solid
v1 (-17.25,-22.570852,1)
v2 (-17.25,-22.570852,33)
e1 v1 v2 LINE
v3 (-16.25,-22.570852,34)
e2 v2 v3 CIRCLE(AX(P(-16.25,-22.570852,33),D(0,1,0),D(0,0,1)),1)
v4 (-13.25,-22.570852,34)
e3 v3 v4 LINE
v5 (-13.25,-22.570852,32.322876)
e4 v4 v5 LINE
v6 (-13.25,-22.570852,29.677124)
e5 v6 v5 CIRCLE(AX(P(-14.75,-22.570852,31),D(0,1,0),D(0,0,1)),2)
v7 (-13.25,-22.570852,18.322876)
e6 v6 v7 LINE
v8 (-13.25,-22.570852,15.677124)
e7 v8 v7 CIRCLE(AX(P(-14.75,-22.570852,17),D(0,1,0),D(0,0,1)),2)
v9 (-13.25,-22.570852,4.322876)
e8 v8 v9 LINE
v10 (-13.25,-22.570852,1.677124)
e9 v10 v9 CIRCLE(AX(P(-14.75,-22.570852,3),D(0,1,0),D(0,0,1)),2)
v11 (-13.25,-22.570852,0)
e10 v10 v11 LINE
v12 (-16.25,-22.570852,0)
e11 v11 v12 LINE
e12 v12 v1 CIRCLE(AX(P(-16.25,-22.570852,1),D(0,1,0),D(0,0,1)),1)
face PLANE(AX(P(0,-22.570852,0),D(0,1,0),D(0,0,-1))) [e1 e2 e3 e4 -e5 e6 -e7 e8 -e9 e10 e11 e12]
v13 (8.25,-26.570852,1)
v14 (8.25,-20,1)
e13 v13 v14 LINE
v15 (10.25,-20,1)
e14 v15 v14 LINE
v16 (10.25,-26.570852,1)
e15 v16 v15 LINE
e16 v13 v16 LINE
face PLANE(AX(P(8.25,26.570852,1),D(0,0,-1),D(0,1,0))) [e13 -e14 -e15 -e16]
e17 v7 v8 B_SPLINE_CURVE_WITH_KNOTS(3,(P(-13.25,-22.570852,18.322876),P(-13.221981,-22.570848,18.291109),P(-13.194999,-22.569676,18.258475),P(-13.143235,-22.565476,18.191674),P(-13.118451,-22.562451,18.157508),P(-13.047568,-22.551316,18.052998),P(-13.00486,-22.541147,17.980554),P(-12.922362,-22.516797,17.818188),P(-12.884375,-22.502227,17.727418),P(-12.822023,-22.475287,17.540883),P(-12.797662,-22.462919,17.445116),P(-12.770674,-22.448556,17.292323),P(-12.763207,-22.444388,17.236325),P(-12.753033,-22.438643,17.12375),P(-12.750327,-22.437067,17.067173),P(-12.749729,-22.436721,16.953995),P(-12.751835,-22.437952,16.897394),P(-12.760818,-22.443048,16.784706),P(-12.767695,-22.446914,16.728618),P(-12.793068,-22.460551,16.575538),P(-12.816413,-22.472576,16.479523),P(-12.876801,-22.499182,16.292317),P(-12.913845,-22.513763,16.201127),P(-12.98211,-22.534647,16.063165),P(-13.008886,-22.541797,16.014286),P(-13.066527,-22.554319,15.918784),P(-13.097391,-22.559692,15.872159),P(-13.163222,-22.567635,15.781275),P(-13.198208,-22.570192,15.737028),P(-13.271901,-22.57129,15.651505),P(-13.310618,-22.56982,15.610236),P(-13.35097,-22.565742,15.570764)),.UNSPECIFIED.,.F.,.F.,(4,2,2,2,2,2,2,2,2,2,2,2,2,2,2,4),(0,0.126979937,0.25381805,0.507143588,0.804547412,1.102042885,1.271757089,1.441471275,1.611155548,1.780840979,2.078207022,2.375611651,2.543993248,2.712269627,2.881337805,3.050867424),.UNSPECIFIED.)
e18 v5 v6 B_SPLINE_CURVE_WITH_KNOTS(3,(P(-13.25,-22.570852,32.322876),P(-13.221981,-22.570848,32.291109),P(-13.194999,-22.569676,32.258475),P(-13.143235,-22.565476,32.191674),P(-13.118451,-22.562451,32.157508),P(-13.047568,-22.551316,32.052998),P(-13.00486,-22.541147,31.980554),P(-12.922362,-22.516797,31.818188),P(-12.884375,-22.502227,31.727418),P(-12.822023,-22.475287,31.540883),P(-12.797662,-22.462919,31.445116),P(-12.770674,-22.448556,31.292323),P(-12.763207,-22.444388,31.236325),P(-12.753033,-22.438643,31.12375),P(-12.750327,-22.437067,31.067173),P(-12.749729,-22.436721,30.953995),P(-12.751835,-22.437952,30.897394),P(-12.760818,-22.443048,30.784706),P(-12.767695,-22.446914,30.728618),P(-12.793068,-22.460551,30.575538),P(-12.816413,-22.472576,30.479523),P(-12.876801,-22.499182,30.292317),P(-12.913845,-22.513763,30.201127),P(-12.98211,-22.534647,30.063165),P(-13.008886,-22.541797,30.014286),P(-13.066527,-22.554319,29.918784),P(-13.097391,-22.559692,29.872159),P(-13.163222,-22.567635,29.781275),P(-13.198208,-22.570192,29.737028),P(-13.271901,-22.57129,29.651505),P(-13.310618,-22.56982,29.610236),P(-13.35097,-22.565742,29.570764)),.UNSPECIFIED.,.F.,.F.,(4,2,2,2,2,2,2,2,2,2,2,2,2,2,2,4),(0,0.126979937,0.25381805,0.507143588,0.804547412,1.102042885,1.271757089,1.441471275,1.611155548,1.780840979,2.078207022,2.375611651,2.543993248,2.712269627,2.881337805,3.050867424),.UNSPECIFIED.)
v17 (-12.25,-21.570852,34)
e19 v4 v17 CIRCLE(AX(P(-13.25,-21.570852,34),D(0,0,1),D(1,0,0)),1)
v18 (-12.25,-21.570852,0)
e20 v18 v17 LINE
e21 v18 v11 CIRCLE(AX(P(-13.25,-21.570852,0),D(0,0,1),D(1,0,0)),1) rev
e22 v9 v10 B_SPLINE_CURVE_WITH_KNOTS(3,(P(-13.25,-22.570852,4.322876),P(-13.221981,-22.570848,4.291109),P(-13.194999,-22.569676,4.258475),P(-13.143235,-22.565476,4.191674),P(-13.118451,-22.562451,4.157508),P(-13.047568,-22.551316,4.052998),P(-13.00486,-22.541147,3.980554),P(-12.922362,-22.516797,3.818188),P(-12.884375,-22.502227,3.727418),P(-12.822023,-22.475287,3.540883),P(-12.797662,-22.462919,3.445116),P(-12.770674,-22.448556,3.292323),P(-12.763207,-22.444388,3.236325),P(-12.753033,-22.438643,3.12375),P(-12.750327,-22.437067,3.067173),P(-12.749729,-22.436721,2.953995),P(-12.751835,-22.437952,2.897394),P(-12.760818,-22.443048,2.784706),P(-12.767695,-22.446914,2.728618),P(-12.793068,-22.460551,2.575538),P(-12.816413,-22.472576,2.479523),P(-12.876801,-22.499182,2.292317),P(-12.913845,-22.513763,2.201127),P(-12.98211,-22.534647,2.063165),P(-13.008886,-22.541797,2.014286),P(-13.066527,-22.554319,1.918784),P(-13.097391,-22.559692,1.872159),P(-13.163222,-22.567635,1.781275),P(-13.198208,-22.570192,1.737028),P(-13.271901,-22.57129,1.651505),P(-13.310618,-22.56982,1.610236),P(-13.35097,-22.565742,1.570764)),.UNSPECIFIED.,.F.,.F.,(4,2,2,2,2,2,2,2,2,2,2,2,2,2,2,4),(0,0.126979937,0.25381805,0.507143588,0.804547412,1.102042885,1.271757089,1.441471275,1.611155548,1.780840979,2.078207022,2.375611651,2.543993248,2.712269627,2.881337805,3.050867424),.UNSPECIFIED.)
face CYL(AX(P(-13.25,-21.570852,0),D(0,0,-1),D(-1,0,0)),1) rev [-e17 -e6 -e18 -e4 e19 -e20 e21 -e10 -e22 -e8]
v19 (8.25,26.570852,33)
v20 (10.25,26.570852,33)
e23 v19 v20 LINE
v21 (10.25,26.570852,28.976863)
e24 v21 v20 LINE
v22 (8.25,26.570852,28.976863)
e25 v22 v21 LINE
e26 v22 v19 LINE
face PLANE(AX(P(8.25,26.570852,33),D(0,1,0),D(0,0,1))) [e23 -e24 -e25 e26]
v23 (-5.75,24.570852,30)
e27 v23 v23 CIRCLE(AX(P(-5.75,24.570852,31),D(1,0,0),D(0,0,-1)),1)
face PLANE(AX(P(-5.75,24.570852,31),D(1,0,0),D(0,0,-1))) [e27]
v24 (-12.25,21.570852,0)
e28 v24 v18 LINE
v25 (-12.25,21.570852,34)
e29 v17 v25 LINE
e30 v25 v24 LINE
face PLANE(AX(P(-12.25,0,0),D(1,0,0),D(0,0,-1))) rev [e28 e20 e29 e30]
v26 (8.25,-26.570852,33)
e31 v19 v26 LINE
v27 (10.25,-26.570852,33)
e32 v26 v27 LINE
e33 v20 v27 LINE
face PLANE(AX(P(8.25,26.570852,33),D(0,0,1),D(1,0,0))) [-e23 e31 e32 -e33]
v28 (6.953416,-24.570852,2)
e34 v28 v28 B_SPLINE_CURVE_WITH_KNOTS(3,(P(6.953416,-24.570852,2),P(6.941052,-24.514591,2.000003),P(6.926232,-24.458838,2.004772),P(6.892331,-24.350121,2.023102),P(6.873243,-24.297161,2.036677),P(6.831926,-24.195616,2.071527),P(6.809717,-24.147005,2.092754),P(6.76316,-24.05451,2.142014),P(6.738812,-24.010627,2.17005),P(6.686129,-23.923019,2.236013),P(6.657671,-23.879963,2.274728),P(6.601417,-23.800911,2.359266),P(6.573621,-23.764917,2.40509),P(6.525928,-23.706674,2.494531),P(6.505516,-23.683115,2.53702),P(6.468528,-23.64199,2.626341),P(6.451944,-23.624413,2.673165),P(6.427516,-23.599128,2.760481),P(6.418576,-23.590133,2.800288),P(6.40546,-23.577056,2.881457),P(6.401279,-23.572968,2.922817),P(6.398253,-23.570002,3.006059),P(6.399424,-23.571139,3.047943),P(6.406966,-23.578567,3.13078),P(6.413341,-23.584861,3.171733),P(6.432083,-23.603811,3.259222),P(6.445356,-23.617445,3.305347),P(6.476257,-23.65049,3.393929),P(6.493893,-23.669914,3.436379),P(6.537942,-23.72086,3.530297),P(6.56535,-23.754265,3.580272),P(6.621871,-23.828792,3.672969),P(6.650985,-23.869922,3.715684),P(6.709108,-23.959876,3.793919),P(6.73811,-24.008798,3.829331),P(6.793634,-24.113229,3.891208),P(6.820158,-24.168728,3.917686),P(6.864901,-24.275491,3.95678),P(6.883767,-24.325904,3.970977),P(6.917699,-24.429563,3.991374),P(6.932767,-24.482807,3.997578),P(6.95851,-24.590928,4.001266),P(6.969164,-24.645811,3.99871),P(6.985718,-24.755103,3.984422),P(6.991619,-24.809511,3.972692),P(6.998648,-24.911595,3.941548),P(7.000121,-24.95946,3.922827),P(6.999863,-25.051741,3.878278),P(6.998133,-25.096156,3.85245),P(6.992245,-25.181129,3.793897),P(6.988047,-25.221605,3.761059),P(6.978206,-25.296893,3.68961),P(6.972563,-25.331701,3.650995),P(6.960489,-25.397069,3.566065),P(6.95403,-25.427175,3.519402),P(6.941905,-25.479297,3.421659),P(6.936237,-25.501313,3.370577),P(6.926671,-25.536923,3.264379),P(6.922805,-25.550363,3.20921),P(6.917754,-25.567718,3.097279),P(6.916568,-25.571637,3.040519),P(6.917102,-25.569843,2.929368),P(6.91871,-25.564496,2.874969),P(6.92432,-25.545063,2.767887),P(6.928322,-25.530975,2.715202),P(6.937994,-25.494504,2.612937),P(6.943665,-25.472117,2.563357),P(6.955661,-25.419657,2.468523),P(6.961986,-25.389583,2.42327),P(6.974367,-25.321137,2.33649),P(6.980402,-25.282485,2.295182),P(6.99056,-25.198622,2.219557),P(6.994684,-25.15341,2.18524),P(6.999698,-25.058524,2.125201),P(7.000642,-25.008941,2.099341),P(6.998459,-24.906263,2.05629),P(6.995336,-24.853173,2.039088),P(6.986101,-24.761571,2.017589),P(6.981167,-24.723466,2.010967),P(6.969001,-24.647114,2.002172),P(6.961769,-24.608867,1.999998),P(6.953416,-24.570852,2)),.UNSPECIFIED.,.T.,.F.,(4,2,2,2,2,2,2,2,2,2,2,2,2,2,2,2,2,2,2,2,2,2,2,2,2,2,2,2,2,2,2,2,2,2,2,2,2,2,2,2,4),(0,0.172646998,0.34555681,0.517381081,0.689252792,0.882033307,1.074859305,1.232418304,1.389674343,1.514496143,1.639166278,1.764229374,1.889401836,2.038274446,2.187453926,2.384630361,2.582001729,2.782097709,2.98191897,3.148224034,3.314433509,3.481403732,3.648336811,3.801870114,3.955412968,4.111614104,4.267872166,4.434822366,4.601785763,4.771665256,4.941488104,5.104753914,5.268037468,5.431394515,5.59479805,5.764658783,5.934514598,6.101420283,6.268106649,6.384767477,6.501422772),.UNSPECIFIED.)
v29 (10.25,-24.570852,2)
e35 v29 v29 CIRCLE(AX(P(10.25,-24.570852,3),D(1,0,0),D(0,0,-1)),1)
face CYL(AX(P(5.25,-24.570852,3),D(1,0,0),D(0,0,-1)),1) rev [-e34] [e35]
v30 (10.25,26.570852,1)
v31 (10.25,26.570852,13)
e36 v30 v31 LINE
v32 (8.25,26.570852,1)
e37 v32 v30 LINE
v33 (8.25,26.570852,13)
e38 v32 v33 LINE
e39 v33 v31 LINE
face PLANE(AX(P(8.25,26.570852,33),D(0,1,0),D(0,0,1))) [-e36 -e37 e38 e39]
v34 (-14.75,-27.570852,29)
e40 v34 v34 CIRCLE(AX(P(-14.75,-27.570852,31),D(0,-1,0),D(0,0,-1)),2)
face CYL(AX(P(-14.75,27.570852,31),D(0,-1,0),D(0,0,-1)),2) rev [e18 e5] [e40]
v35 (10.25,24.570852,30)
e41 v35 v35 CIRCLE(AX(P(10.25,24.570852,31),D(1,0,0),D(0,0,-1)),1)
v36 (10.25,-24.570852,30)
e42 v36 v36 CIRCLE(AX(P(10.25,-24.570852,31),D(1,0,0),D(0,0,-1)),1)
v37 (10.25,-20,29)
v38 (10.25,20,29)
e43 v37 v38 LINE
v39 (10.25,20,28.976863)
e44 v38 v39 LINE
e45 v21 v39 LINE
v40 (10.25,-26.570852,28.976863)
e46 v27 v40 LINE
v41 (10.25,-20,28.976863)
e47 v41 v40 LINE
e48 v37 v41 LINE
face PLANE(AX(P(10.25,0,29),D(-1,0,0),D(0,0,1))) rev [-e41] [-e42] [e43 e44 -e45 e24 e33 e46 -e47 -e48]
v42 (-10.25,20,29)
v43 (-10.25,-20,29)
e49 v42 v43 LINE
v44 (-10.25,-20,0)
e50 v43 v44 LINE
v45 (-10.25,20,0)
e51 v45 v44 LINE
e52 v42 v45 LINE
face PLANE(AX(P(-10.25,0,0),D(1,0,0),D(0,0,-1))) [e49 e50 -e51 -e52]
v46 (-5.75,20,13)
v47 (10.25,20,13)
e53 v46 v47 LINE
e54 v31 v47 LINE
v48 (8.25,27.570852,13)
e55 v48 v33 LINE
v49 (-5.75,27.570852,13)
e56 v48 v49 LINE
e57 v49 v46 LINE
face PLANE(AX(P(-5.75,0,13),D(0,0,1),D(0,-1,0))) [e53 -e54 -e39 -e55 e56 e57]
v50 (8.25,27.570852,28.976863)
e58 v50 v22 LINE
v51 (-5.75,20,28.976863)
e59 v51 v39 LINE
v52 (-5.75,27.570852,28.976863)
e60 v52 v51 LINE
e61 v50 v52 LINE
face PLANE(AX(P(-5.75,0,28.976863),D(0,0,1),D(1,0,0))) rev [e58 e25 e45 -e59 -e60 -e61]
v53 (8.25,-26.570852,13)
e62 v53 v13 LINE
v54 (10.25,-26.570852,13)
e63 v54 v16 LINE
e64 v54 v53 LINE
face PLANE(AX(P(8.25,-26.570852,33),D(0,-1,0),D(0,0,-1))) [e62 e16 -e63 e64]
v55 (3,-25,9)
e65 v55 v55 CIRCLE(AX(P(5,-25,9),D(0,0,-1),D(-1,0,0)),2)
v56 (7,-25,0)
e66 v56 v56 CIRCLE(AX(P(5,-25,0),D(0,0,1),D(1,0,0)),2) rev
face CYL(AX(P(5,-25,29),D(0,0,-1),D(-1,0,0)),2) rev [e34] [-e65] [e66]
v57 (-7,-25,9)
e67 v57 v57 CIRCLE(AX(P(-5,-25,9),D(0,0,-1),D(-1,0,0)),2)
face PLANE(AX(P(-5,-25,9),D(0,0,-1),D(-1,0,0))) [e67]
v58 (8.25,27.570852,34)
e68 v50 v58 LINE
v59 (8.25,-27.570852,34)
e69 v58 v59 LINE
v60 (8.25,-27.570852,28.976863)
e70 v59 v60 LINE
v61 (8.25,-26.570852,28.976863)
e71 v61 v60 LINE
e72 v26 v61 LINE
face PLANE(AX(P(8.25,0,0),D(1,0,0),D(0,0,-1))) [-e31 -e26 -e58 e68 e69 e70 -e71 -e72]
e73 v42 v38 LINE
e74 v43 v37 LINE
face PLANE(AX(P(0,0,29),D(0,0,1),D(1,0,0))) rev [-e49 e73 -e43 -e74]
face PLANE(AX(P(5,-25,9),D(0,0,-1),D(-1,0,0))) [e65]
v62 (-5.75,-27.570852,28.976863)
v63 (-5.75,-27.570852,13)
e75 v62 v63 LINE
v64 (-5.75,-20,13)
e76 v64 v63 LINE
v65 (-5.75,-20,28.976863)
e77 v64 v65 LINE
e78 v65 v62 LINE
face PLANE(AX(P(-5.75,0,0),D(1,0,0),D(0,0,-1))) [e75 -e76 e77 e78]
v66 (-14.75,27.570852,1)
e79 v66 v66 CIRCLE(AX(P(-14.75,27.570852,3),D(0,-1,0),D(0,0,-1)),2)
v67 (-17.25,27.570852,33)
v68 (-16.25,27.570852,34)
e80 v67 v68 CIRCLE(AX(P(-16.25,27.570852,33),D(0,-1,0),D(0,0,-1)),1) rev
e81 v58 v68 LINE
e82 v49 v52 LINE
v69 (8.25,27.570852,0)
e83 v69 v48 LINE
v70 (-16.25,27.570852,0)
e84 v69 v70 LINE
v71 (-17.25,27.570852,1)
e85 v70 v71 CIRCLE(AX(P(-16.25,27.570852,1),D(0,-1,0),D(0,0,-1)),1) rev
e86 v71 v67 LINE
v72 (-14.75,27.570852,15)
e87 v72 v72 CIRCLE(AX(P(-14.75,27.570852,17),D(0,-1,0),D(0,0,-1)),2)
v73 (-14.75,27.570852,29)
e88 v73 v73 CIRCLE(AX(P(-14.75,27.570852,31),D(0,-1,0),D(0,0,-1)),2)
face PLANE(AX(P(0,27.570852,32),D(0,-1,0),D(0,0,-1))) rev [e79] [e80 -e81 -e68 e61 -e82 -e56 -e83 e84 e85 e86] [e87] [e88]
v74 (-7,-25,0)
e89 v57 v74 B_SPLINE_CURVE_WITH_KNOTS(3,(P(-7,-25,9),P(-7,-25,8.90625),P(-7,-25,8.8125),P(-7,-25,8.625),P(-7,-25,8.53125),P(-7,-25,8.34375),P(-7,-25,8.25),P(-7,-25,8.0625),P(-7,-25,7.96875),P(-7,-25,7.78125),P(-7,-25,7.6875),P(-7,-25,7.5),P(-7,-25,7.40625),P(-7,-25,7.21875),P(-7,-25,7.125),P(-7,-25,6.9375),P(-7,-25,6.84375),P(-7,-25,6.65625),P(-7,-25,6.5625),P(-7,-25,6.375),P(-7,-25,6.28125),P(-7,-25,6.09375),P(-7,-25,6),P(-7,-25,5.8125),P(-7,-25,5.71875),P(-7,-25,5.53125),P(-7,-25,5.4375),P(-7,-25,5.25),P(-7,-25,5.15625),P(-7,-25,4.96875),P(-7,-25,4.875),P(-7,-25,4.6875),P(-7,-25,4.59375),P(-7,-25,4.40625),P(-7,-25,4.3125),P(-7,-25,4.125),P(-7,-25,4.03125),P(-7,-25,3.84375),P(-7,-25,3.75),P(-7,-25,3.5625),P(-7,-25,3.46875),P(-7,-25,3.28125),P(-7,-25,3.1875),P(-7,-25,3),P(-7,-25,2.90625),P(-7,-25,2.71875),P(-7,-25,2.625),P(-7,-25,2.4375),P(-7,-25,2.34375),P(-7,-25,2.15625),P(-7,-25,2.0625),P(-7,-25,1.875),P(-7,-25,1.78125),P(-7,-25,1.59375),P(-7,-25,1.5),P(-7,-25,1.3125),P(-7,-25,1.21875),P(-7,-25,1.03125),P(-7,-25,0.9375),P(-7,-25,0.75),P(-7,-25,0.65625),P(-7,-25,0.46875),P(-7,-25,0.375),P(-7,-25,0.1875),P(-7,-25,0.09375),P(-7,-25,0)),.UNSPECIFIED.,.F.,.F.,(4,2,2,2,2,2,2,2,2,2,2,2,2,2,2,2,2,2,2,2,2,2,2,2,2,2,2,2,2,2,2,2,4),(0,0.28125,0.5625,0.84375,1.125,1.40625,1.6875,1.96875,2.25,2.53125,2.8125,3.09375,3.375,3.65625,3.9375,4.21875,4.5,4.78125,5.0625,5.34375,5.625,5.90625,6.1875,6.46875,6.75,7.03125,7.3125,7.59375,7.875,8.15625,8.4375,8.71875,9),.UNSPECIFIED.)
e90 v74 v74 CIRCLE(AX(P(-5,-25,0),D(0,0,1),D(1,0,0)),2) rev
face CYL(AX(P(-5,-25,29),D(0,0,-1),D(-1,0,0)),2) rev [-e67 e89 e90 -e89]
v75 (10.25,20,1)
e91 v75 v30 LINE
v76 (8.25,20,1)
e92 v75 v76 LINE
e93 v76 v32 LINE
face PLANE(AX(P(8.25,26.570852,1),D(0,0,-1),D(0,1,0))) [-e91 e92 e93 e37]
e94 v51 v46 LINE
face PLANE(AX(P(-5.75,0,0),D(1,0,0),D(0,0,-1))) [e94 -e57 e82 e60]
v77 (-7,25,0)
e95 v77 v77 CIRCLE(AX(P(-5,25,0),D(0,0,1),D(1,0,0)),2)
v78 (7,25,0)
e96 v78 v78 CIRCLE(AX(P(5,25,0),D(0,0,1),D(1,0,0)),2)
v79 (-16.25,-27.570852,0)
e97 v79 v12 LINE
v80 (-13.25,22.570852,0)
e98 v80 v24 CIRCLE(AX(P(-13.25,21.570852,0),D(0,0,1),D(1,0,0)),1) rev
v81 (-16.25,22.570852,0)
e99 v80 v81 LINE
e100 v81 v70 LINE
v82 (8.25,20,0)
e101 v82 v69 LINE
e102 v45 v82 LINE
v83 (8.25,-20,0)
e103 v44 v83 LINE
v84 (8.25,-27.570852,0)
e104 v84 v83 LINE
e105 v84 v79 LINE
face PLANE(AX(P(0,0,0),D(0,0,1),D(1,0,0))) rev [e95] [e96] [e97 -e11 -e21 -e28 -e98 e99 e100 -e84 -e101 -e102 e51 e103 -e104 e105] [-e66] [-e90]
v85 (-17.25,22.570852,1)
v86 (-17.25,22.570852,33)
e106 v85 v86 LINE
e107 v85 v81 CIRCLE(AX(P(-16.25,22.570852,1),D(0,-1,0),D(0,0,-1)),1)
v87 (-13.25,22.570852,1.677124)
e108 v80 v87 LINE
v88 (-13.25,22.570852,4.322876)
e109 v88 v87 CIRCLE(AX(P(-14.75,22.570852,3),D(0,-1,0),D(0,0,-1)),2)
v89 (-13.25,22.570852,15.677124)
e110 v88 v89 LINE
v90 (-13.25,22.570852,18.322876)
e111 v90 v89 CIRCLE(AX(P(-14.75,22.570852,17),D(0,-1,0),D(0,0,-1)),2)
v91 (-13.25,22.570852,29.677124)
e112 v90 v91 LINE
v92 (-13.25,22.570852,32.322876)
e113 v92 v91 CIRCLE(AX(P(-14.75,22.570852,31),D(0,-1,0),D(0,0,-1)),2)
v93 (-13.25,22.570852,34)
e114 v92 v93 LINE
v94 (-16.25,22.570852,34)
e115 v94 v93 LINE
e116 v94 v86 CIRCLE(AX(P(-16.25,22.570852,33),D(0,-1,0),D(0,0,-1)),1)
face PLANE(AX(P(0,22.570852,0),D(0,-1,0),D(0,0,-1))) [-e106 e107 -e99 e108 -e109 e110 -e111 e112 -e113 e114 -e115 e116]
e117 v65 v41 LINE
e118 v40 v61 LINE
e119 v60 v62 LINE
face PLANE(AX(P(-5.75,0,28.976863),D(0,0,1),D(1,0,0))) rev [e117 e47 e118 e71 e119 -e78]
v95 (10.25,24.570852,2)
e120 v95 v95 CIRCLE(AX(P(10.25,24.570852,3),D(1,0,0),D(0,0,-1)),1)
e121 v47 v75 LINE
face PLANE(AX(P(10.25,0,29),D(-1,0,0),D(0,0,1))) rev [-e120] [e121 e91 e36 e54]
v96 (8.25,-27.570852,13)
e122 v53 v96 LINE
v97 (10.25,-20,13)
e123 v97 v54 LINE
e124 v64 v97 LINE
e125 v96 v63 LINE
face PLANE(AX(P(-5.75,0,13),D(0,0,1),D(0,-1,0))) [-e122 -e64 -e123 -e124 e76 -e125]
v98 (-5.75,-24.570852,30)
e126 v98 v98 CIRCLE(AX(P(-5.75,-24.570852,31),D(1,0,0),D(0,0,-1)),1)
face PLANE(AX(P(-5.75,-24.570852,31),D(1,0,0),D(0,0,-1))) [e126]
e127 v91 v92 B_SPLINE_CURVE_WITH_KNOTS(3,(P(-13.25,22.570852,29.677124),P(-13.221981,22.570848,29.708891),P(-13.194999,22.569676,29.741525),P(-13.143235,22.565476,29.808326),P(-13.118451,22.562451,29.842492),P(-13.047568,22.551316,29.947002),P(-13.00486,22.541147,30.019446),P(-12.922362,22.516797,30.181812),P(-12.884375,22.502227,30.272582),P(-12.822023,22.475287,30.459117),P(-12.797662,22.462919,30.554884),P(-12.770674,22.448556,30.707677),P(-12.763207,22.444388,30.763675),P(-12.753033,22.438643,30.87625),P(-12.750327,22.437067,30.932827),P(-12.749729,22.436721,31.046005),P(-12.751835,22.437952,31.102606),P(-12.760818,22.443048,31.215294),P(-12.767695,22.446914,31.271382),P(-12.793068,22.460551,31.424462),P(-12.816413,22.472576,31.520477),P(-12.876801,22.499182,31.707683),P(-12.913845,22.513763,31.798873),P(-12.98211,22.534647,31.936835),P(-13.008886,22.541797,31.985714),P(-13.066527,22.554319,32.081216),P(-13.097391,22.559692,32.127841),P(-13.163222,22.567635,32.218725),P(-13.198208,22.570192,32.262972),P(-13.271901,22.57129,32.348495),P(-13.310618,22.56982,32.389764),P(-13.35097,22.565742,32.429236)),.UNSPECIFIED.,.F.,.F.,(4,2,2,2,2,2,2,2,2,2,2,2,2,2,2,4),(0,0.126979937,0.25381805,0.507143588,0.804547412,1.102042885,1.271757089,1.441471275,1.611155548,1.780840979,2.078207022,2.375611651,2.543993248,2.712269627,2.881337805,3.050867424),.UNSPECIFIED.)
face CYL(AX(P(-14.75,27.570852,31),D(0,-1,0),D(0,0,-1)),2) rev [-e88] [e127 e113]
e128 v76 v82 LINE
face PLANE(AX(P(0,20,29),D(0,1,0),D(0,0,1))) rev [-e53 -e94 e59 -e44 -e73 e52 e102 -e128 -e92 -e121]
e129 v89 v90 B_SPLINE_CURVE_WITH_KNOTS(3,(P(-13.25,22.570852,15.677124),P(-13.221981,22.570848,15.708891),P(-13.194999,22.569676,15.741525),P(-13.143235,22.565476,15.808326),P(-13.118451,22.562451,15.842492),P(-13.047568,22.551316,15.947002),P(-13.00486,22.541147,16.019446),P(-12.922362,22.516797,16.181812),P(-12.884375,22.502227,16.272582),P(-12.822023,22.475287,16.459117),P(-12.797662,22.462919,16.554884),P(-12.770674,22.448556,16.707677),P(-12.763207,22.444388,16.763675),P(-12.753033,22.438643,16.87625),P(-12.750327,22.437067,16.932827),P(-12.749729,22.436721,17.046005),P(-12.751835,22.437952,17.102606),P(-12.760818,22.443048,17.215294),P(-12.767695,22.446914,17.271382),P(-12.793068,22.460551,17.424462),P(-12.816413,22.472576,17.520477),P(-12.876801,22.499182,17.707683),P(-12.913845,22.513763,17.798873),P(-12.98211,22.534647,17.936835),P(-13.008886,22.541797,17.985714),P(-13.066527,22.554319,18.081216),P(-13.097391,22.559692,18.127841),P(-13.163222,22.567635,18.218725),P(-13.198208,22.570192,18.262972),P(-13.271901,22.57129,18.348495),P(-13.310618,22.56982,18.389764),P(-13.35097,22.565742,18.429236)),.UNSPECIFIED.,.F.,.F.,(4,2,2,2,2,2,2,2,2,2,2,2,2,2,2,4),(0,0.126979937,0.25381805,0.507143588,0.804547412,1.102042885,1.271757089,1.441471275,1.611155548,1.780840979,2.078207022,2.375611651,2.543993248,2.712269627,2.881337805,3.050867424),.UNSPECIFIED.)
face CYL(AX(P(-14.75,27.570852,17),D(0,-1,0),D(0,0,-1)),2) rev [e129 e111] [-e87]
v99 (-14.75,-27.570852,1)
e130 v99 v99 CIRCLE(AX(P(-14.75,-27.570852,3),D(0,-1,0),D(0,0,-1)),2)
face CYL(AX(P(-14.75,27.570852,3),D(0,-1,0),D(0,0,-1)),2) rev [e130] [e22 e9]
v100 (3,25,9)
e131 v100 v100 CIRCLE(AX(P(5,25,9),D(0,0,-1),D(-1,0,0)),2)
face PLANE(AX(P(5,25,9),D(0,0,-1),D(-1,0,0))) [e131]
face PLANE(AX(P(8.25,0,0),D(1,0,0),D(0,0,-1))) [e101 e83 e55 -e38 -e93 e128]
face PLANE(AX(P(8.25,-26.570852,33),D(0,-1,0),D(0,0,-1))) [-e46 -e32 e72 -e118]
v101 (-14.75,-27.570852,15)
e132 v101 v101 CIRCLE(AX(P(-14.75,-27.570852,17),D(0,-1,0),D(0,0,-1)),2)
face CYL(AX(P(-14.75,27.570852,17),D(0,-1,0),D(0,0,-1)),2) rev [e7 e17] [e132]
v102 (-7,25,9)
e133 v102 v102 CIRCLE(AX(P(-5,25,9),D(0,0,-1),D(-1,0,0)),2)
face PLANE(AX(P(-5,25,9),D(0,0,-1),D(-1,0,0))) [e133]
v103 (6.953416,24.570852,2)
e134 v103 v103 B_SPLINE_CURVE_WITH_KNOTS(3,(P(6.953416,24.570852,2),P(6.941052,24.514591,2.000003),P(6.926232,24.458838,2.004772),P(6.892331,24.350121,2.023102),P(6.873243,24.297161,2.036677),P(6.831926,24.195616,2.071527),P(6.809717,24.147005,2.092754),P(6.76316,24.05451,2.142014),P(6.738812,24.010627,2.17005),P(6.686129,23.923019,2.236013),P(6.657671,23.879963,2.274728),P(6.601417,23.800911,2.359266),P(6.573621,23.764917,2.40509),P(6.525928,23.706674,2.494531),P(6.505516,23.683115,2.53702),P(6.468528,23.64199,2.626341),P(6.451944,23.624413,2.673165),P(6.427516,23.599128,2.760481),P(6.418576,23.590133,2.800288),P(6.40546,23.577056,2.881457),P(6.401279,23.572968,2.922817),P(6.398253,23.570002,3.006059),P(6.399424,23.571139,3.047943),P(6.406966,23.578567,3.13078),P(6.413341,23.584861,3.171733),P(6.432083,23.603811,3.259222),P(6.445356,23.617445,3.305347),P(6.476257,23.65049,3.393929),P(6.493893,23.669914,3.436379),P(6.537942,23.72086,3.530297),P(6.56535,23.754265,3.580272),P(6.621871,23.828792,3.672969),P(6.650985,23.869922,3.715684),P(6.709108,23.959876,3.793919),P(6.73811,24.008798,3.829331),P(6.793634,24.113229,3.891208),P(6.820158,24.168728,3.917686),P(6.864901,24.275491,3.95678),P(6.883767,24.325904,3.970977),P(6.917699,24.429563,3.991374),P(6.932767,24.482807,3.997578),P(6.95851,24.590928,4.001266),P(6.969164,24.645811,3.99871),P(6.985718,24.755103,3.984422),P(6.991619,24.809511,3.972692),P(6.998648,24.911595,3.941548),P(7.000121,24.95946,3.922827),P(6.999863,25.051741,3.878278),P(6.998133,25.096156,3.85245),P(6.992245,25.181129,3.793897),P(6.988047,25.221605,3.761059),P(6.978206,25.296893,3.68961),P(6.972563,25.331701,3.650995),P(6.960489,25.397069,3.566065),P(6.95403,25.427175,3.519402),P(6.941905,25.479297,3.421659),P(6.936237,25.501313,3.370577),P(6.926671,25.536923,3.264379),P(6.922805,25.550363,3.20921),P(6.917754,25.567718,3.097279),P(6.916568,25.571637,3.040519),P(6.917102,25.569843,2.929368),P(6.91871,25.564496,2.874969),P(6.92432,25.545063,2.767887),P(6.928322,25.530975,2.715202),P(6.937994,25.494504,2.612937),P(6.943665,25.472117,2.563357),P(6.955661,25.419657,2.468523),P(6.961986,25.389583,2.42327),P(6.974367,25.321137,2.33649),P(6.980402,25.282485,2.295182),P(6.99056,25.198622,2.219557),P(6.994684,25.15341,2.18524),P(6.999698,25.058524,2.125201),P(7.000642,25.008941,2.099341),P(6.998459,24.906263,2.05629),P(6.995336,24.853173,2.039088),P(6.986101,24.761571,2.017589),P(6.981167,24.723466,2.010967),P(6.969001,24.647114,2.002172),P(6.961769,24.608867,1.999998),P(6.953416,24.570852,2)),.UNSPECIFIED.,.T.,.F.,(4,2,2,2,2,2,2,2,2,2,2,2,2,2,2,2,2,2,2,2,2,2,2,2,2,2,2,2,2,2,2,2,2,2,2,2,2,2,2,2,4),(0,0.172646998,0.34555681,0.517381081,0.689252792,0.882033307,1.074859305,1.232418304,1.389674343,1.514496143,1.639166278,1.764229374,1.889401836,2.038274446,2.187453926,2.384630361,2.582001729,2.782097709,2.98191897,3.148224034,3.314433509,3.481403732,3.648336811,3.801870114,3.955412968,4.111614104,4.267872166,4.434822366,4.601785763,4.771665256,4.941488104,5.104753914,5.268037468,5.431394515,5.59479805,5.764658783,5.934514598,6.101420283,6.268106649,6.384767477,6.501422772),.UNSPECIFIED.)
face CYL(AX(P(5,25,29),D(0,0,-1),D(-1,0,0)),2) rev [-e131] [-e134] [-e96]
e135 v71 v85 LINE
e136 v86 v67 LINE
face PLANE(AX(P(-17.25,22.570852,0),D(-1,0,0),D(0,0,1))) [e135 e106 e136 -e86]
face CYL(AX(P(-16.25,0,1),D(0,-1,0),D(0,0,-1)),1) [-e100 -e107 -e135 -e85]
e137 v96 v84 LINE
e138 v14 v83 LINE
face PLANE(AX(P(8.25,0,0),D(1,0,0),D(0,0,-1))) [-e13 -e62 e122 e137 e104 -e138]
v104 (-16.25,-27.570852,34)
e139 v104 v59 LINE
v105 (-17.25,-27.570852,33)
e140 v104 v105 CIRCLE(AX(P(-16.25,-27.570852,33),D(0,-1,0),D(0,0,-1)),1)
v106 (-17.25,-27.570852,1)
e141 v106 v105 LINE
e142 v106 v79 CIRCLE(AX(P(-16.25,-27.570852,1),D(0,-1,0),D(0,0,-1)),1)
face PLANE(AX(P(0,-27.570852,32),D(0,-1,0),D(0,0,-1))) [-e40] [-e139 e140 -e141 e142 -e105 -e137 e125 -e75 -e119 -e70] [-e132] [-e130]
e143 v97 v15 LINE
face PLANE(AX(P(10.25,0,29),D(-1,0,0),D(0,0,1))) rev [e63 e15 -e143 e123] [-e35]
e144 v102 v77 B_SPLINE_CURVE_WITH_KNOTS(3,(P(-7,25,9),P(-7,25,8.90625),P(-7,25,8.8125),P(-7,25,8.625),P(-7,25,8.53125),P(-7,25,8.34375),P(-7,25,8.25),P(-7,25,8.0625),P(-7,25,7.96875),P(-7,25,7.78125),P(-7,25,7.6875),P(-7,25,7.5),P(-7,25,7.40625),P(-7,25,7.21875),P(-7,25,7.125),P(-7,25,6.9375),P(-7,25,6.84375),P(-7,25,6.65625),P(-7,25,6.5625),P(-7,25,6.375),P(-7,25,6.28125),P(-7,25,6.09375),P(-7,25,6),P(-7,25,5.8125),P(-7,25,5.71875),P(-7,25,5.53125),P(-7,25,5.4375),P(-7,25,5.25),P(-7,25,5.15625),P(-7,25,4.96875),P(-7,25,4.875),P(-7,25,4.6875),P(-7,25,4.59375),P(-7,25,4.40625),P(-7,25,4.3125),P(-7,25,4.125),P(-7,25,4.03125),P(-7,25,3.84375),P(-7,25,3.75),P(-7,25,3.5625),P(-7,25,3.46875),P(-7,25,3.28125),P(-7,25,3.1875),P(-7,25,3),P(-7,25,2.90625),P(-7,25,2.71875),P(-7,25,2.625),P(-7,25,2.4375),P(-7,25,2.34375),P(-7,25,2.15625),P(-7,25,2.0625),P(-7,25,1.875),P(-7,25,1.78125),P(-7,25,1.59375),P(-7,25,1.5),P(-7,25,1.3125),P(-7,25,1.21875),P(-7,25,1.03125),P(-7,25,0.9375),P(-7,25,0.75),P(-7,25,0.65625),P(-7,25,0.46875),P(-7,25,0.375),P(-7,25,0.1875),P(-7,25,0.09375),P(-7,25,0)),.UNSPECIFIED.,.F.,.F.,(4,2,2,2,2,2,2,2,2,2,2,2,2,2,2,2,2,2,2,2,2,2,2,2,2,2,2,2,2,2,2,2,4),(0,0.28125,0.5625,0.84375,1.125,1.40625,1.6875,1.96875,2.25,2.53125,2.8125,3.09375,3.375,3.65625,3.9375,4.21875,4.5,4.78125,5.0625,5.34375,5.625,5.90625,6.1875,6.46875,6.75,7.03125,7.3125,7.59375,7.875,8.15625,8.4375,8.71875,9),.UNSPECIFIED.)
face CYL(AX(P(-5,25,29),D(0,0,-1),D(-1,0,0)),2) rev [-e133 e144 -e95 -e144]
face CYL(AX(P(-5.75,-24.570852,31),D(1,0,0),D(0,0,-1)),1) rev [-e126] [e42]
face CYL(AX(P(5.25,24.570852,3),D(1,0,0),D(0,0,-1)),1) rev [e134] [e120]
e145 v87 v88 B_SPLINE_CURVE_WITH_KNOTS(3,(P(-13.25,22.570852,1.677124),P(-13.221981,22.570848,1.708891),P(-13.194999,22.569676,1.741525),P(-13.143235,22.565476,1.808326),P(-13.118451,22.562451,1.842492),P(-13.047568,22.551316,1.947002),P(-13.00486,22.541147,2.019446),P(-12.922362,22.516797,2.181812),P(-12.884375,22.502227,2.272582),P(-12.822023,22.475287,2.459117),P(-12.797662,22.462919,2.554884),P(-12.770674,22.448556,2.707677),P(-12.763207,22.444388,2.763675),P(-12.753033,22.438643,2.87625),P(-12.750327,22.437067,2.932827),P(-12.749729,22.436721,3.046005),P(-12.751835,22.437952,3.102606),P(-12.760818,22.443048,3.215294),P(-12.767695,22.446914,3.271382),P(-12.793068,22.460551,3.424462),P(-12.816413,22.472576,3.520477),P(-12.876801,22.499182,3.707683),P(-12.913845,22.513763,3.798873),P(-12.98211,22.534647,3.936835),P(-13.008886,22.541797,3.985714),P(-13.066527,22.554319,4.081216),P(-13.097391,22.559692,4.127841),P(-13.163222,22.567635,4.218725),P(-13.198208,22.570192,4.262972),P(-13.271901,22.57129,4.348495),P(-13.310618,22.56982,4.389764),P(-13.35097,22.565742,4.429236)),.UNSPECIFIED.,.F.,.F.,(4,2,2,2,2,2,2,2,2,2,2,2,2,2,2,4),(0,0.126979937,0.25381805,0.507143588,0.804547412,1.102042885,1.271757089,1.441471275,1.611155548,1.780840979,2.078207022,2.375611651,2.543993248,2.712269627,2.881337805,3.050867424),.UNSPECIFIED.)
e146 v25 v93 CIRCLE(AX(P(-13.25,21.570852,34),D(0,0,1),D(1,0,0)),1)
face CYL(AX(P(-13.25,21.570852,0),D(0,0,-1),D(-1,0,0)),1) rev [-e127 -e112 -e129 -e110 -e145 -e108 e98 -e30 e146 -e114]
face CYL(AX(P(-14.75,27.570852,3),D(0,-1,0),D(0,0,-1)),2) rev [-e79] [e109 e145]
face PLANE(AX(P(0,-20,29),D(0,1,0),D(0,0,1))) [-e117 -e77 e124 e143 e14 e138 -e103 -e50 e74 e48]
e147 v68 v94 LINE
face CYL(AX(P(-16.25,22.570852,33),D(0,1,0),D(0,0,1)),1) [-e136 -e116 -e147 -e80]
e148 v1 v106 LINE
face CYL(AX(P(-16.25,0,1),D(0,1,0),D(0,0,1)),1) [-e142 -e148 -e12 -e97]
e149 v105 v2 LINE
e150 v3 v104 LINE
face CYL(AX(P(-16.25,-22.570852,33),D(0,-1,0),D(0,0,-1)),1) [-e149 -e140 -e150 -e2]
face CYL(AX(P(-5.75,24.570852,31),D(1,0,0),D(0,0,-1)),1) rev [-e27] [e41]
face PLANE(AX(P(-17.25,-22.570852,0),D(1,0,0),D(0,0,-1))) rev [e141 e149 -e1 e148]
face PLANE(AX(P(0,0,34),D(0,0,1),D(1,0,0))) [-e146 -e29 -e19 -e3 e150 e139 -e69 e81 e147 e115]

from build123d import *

# Parameters (mm, degrees)
SKETCH_1_R           = 2.000000000000001
EXTRUDE_1_DEPTH      = 29
SKETCH_2_W           = 20.5
SKETCH_2_H           = 70.28340969233892
EXTRUDE_2_DEPTH      = 3
SKETCH_3_W           = 20.5
SKETCH_3_H           = 7.570852423084727
CUT_EXTRUDE_1_DEPTH  = 49.62100286394029
SKETCH_5_R           = 2.5
EXTRUDE_3_DEPTH      = 10
CUT_EXTRUDE_2_REACH  = 75.297
SKETCH_8_R           = 1.6000000000000003
SKETCH_9_W           = 20.5
SKETCH_9_H           = 32
CUT_EXTRUDE_3_DEPTH  = 65.57298284377197
SKETCH_12_W          = 20.499999999999996
SKETCH_12_H          = 7.57085242308473
SKETCH_12_R          = 2.0000000000000018
SKETCH_12_R_2        = 2.000000000000001
EXTRUDE_5_DEPTH      = 30
EXTRUDE_6_DEPTH      = 10
SKETCH_16_R          = 1.5000000000000004
CUT_EXTRUDE_5_DEPTH  = 48.388093987806805
SKETCH_17_R          = 1.5000000000000004
CUT_EXTRUDE_6_DEPTH  = 51.404676958704755
EXTRUDE_START        = 10
SKETCH_19_R          = 4
SKETCH_19_R_2        = 2.5000000000000004
EXTRUDE_7_DEPTH      = 10
SKETCH_21_R          = 1.5000000000000004
CUT_EXTRUDE_7_DEPTH  = 48.38809406709012
SKETCH_22_R          = 1.5000000000000004
CUT_EXTRUDE_8_DEPTH  = 51.404676958704755
SKETCH_23_W          = 20.5
SKETCH_23_H          = 55.141704846169446
EXTRUDE_8_DEPTH      = 2
EXTRUDE_9_DEPTH      = 2
CUT_EXTRUDE_9_DEPTH  = 16
EXTRUDE_START_2      = 20
SKETCH_26_R          = 2.000000000000003
SKETCH_26_R_2        = 2.000000000000001
SKETCH_26_R_3        = 2.000000000000002
EXTRUDE_10_DEPTH     = 20
SKETCH_27_W          = 16
SKETCH_27_H          = 8.000000000000007
CUT_EXTRUDE_10_DEPTH = 75.49499461906014
SKETCH_29_W          = 34
SKETCH_29_H          = 55.14170484616947
CUT_EXTRUDE_11_DEPTH = 2
SKETCH_32_W          = 3.9768627953179667
SKETCH_32_H          = 6.57085242308473
CUT_EXTRUDE_13_DEPTH = 16
SKETCH_33_R          = 1.0000000000000018
CUT_EXTRUDE_14_DEPTH = 16
SKETCH_35_R          = 1.0000000000000004
CUT_EXTRUDE_15_DEPTH = 5
SKETCH_36_R          = 2.65
CUT_EXTRUDE_16_DEPTH = 10
CUT_EXTRUDE_START    = -10
SKETCH_37_R          = 2.65
CUT_EXTRUDE_17_DEPTH = 10
SKETCH_38_W          = 37
SKETCH_38_H          = 68
CUT_EXTRUDE_18_DEPTH = 10
SKETCH_39_W          = 24.000000000000007
SKETCH_39_H          = 55.141704846169446
EXTRUDE_11_DEPTH     = 2
SKETCH_40_W          = 20.5
SKETCH_40_H          = 34
CUT_EXTRUDE_19_DEPTH = 66.92928115292985
EXTRUDE_12_DEPTH     = 5
SKETCH_42_R          = 1.9999999999999991
SKETCH_42_R_2        = 1.9999999999999996
SKETCH_42_R_3        = 2
CUT_EXTRUDE_20_DEPTH = 68.03857183250602
FILLET_1_R           = 1
FILLET_2_R           = 1
FILLET_3_R           = 1
FILLET_4_R           = 1
FILLET_5_R           = 1
FILLET_6_R           = 1


with BuildPart() as part:
    # 草图1 → 凸台-拉伸1 (new body)
    # profile 1 of 3: a face of its own
    with BuildSketch(Plane.XY):
        with BuildLine():
            Line((-10.250000000000004, 35.14170484616946), (-10.250000000000004, 20))
            Line((-10.25, 20.000000000000004), (-4.999999999999999, 20.000000000000004))
            Line((-4.999999999999999, 20.000000000000004), (-4.999999999999999, 23.000000000000004))
            ThreePointArc((-5.000000000000001, 23.000000000000004), (-6.414213562373094, 26.4142135623731), (-2.9999999999999982, 25.000000000000004))
            Line((-2.9999999999999982, 25.000000000000004), (3, 25.000000000000004))
            ThreePointArc((3, 25.000000000000004), (5.000000000000001, 27.000000000000004), (7.000000000000002, 25.000000000000004))
            ThreePointArc((7.000000000000002, 25.000000000000004), (6.414213562373095, 23.585786437626908), (4.999999999999999, 23.000000000000004))
            Line((5.000000000000001, 23.000000000000004), (5.000000000000001, 20.000000000000004))
            Line((5, 20.000000000000004), (10.249999999999996, 20.000000000000004))
            Line((10.249999999999996, 20), (10.249999999999996, 35.14170484616946))
            Line((10.249999999999996, 35.14170484616946), (-10.250000000000004, 35.14170484616946))
        make_face()
    # profile 2 of 3: a face of its own
    with BuildSketch(Plane.XY):
        Polygon((10.249999999999996, -20), (-10.25, -20), (-10.250000000000004, -35.14170484616946), (10.249999999999996, -35.14170484616946), align=None)
        with Locations(Location((-4.999999999999999, -25.000000000000004, 0), (0, 0, 180))):
            Circle(SKETCH_1_R, mode=Mode.SUBTRACT)
        with Locations(Location((5.000000000000001, -25.000000000000004, 0), (0, 0, 180))):
            Circle(SKETCH_1_R, mode=Mode.SUBTRACT)
    # profile 3 of 3: a face of its own
    with BuildSketch(Plane.XY):
        with BuildLine():
            Line((-4.999999999999999, 23.000000000000004), (-4.999999999999999, 20.000000000000004))
            Line((-4.999999999999999, 20.000000000000004), (5, 20.000000000000004))
            Line((5.000000000000001, 20.000000000000004), (5.000000000000001, 23.000000000000004))
            ThreePointArc((4.999999999999999, 23.000000000000004), (3.585786437626904, 23.585786437626908), (3, 25.000000000000004))
            Line((3, 25.000000000000004), (-2.9999999999999982, 25.000000000000004))
            ThreePointArc((-2.9999999999999982, 25.000000000000004), (-3.585786437626905, 23.585786437626908), (-5.000000000000001, 23.000000000000004))
        make_face()
    extrude(amount=EXTRUDE_1_DEPTH)

    # 草图2 → 凸台-拉伸2 (add)
    with BuildSketch(Plane.XY.offset(29)):
        Rectangle(SKETCH_2_W, SKETCH_2_H)
    extrude(amount=EXTRUDE_2_DEPTH)

    # 草图3 → 切除-拉伸1 (cut, through all)
    with BuildSketch(Plane(origin=(0, 0, 0), x_dir=(-1, 0, 0), z_dir=(0, 0, -1))):
        with Locations((3.55e-15, -31.356278634627095)):
            Rectangle(SKETCH_3_W, SKETCH_3_H)
        Polygon((-10.249999999999996, 35.14170484616946), (-10.249999999999996, 27.57085242308473), (10.250000000000004, 27.570852423084734), (10.250000000000004, 35.14170484616946), align=None)
    extrude(amount=-CUT_EXTRUDE_1_DEPTH, mode=Mode.SUBTRACT)

    # 草图5 → 凸台-拉伸3 (add)
    with BuildSketch(Plane.XZ.offset(27.570852423084734)):
        with Locations(Location((0, 2.5, 0), (0, 0, 270))):
            Circle(SKETCH_5_R)
    extrude(amount=EXTRUDE_3_DEPTH)

    # 草图8 → 切除-拉伸2 (cut, up to next)
    with BuildSketch(Plane(origin=(0, 27.570852423084734, 0), x_dir=(1, 0, 0), z_dir=(0, 1, 0)), mode=Mode.PRIVATE) as cut_extrude_2_sk1:
        with Locations(Location((1.71e-15, -16.5, 0), (0, 0, 270))):
            Circle(SKETCH_8_R)
    cut_extrude_2_tool1 = extrude(cut_extrude_2_sk1.sketch, amount=-CUT_EXTRUDE_2_REACH, mode=Mode.PRIVATE) & part.part
    # 草图8 → 切除-拉伸2 (cut, up to next)
    with BuildSketch(Plane(origin=(0, 27.570852423084734, 0), x_dir=(1, 0, 0), z_dir=(0, 1, 0)), mode=Mode.PRIVATE) as cut_extrude_2_sk2:
        with Locations(Location((1.22e-15, -26.500000000000004, 0), (0, 0, 270))):
            Circle(SKETCH_8_R)
    cut_extrude_2_tool2 = extrude(cut_extrude_2_sk2.sketch, amount=-CUT_EXTRUDE_2_REACH, mode=Mode.PRIVATE) & part.part
    add(cut_extrude_2_tool1.solids().sort_by_distance((0, 27.570852, 16.5))[0], mode=Mode.SUBTRACT)
    add(cut_extrude_2_tool2.solids().sort_by_distance((0, 27.570852, 26.5))[0], mode=Mode.SUBTRACT)

    # 草图9 → 切除-拉伸3 (cut, through all)
    with BuildSketch(Plane.XZ.offset(27.570852423084734)):
        with Locations((-3.55e-15, 16)):
            Rectangle(SKETCH_9_W, SKETCH_9_H)
    extrude(amount=CUT_EXTRUDE_3_DEPTH, mode=Mode.SUBTRACT)

    # 草图12 → 凸台-拉伸5 (add)
    with BuildSketch(Plane(origin=(0, 0, 0), x_dir=(-1, 0, 0), z_dir=(0, 0, -1))):
        with Locations((1.78e-15, 23.78542621154237)):
            Rectangle(SKETCH_12_W, SKETCH_12_H)
        with Locations((-5.000000000000001, 25.000000000000004)):
            Circle(SKETCH_12_R, mode=Mode.SUBTRACT)
        with Locations((4.999999999999999, 25.000000000000004)):
            Circle(SKETCH_12_R_2, mode=Mode.SUBTRACT)
    extrude(amount=-EXTRUDE_5_DEPTH)

    # 草图13 → 凸台-拉伸6 (add)
    with BuildSketch(Plane(origin=(0, 27.570852423084734, 0), x_dir=(1, 0, 0), z_dir=(0, 1, 0))):
        with BuildLine():
            ThreePointArc((4.456e-14, -7.5), (-2.5, -5.000000000000058), (-7.084e-14, -2.4999999999999996))
            Line((-1.4e-16, -2.4999999999999996), (-5e-17, -1))
            ThreePointArc((7.635e-14, -1), (-3.9999999999999996, -4.999999999999907), (-1.067e-13, -9))
            Line((-4.9e-16, -9), (-4.1e-16, -7.5))
        make_face()
        with BuildLine():
            Line((-5e-17, -1), (-1.4e-16, -2.4999999999999996))
            ThreePointArc((-7.084e-14, -2.4999999999999996), (1.7677669529663447, -3.2322330470336054), (2.500000000000001, -5))
            ThreePointArc((2.500000000000001, -5.000000000000001), (1.767766952966385, -6.767766952966354), (4.456e-14, -7.5))
            Line((-4.1e-16, -7.5), (-4.9e-16, -9))
            ThreePointArc((-1.067e-13, -9), (2.828427124746152, -7.828427124746229), (4.000000000000001, -5.000000000000001))
            ThreePointArc((4.000000000000001, -5), (2.8284271247462174, -2.171572875253837), (7.635e-14, -1))
        make_face()
    extrude(amount=EXTRUDE_6_DEPTH)

    # 草图15 → 旋转1 (revolve)
    with BuildSketch(Plane(origin=(0, 0, 0), x_dir=(0, 0, -1), z_dir=(1, 0, 0))):
        with BuildLine():
            Line((-1, 27.570852423084734), (0, 27.570852423084734))
            ThreePointArc((0, 27.570852423084734), (-0.7128919117369903, 27.930797461014013), (-1, 28.676011694509246))
            Line((-1, 28.676011694509246), (-1, 27.570852423084734))
        make_face()
    revolve(axis=Axis((0, -962.4291475769152, 4.99999999999657), (0, 1, 3.43e-15)))

    # 草图16 → 切除-拉伸5 (cut, through all)
    with BuildSketch(Plane.XY.offset(5)):
        with Locations(Location((4.9e-16, 33.57085242308473, 0), (0, 0, 90))):
            Circle(SKETCH_16_R)
    extrude(amount=-CUT_EXTRUDE_5_DEPTH, mode=Mode.SUBTRACT)

    # 草图17 → 切除-拉伸6 (cut, through all)
    with BuildSketch(Plane(origin=(0, 0, 0), x_dir=(0, 0, -1), z_dir=(1, 0, 0))):
        with Locations((-5, 33.57085242308473)):
            Circle(SKETCH_17_R)
    extrude(amount=-CUT_EXTRUDE_6_DEPTH, mode=Mode.SUBTRACT)

    # 草图19 → 凸台-拉伸7 (add)
    with BuildSketch(Plane.XZ.offset(27.570852423084734).offset(EXTRUDE_START)):
        with Locations(Location((0, 4.999999999999998, 0), (0, 0, 270))):
            Circle(SKETCH_19_R)
        with Locations(Location((0, 4.999999999999998, 0), (0, 0, 90))):
            Circle(SKETCH_19_R_2, mode=Mode.SUBTRACT)
    extrude(amount=-EXTRUDE_7_DEPTH)

    # 草图20 → 旋转2 (revolve)
    with BuildSketch(Plane(origin=(0, 0, 0), x_dir=(0, 0, -1), z_dir=(1, 0, 0))):
        with BuildLine():
            Line((-0.9999999999999983, -27.570852423084734), (0, -27.570852423084734))
            ThreePointArc((0, -27.570852423084734), (-0.7071067811865462, -27.863745641898188), (-0.9999999999999981, -28.570852423084734))
            Line((-0.9999999999999981, -28.570852423084734), (-0.9999999999999983, -27.570852423084734))
        make_face()
    revolve(axis=Axis((0, -1027.5708524230847, 4.999999999996567), (0, 1, 3.43e-15)))

    # 草图21 → 切除-拉伸7 (cut, through all)
    with BuildSketch(Plane.XY.offset(5)):
        with Locations((0, -33.57085242308473)):
            Circle(SKETCH_21_R)
    extrude(amount=-CUT_EXTRUDE_7_DEPTH, mode=Mode.SUBTRACT)

    # 草图22 → 切除-拉伸8 (cut, through all)
    with BuildSketch(Plane(origin=(0, 0, 0), x_dir=(0, 0, -1), z_dir=(1, 0, 0))):
        with Locations((-5, -33.57085242308473)):
            Circle(SKETCH_22_R)
    extrude(amount=-CUT_EXTRUDE_8_DEPTH, mode=Mode.SUBTRACT)

    # 草图23 → 凸台-拉伸8 (add)
    with BuildSketch(Plane.XY.offset(32)):
        Rectangle(SKETCH_23_W, SKETCH_23_H)
    extrude(amount=EXTRUDE_8_DEPTH)

    # 草图24 → 凸台-拉伸9 (add)
    with BuildSketch(Plane.ZY.offset(10.250000000000004)):
        Polygon((34, 27.570852423084734), (24, 27.570852423084734), (24.000000000000007, -27.570852423084713), (34, -27.57085242308472), align=None)
    extrude(amount=EXTRUDE_9_DEPTH)

    # 草图25 → 切除-拉伸9 (cut)
    with BuildSketch(Plane(origin=(10.249999999999996, 0, 0), x_dir=(0, 0, -1), z_dir=(1, 0, 0))):
        Polygon((-17, -20), (-25.000000000000004, -20), (-25.000000000000004, -27.570852423084713), (-17, -27.570852423084723), align=None)
        Polygon((-21.000000000000004, 27.570852423084734), (-25.000000000000004, 27.570852423084734), (-25.000000000000004, 20.000000000000004), (-17.000000000000004, 20.000000000000004), (-17.000000000000004, 27.570852423084734), align=None)
    extrude(amount=-CUT_EXTRUDE_9_DEPTH, mode=Mode.SUBTRACT)

    # 草图26 → 凸台-拉伸10 (add)
    with BuildSketch(Plane(origin=(0, 0, 29), x_dir=(-1, 0, 0), z_dir=(0, 0, -1)).offset(EXTRUDE_START_2)):
        with Locations((-5.000000000000001, 25.000000000000004)):
            Circle(SKETCH_26_R)
        with Locations((4.999999999999999, 25.000000000000004)):
            Circle(SKETCH_26_R_2)
        with Locations((-5.000000000000001, -25.000000000000004)):
            Circle(SKETCH_26_R_3)
        with Locations((4.999999999999999, -25.000000000000004)):
            Circle(SKETCH_26_R_2)
    extrude(amount=-EXTRUDE_10_DEPTH)

    # 草图27 → 切除-拉伸10 (cut, through all)
    with BuildSketch(Plane.XZ.offset(27.570852423084734)):
        with Locations((2.2499999999999964, 21.000000000000004)):
            Rectangle(SKETCH_27_W, SKETCH_27_H)
    extrude(amount=-CUT_EXTRUDE_10_DEPTH, mode=Mode.SUBTRACT)

    # 草图29 → 切除-拉伸11 (cut)
    with BuildSketch(Plane(origin=(10.249999999999996, 0, 0), x_dir=(0, 0, -1), z_dir=(1, 0, 0))):
        with Locations((-17, 0)):
            Rectangle(SKETCH_29_W, SKETCH_29_H)
        Polygon((-33, 26.570852423084734), (-33, -26.570852423084734), (-1, -26.570852423084734), (-1.0000000000000009, 26.570852423084734), align=None, mode=Mode.SUBTRACT)
    extrude(amount=-CUT_EXTRUDE_11_DEPTH, mode=Mode.SUBTRACT)

    # 草图32 → 切除-拉伸13 (cut)
    with BuildSketch(Plane(origin=(10.249999999999996, 0, 0), x_dir=(0, 0, -1), z_dir=(1, 0, 0))):
        Polygon((-13, 26.570852423084734), (-25.000000000000004, 26.570852423084734), (-25.000000000000004, 20.000000000000004), (-28.97686279531797, 20.000000000000004), (-28.97686279531797, -19.999999999999996), (-25.000000000000004, -20), (-25.000000000000004, -26.570852423084734), (-12.999999999999993, -26.570852423084734), align=None)
        with Locations((-26.988431397658985, 23.28542621154237)):
            Rectangle(SKETCH_32_W, SKETCH_32_H)
        Polygon((-28.97686279531797, -19.999999999999996), (-28.97686279531797, -26.570852423084734), (-25.000000000000004, -26.570852423084734), (-25.000000000000004, -20), align=None)
        Polygon((-25.000000000000004, -26.570852423084734), (-28.97686279531797, -26.570852423084734), (-28.97686279531797, -27.59191586273335), (-12.999999999999995, -27.59191586273335), (-12.999999999999995, -26.57085242308473), align=None)
        Polygon((-28.97686279531797, 27.59388998719103), (-28.97686279531797, 26.570852423084734), (-25.000000000000004, 26.570852423084734), (-13, 26.570852423084734), (-12.999999999999995, 27.59388998719103), align=None)
    extrude(amount=-CUT_EXTRUDE_13_DEPTH, mode=Mode.SUBTRACT)

    # 草图33 → 切除-拉伸14 (cut)
    with BuildSketch(Plane(origin=(10.249999999999996, 0, 0), x_dir=(0, 0, -1), z_dir=(1, 0, 0))):
        with Locations((-31, 24.57085242308473)):
            Circle(SKETCH_33_R)
        with Locations((-31, -24.57085242308473)):
            Circle(SKETCH_33_R)
    extrude(amount=-CUT_EXTRUDE_14_DEPTH, mode=Mode.SUBTRACT)

    # 草图35 → 切除-拉伸15 (cut)
    with BuildSketch(Plane(origin=(10.249999999999996, 0, 0), x_dir=(0, 0, -1), z_dir=(1, 0, 0))):
        with Locations((-3.000000000000001, 24.57085242308473)):
            Circle(SKETCH_35_R)
        with Locations((-3, -24.57085242308473)):
            Circle(SKETCH_35_R)
    extrude(amount=-CUT_EXTRUDE_15_DEPTH, mode=Mode.SUBTRACT)

    # 草图36 → 切除-拉伸16 (cut)
    with BuildSketch(Plane.XZ.offset(37.57085242308474)):
        with Locations(Location((0, 4.999999999999998, 0), (0, 0, 270))):
            Circle(SKETCH_36_R)
    extrude(amount=-CUT_EXTRUDE_16_DEPTH, mode=Mode.SUBTRACT)

    # 草图37 → 切除-拉伸17 (cut)
    with BuildSketch(Plane(origin=(0, 37.57085242308474, 0), x_dir=(1, 0, 0), z_dir=(0, 1, 0)).offset(CUT_EXTRUDE_START)):
        with Locations(Location((0, -4.999999999999965, 0), (0, 0, 90))):
            Circle(SKETCH_37_R)
    extrude(amount=CUT_EXTRUDE_17_DEPTH, mode=Mode.SUBTRACT)

    # 草图38 → 切除-拉伸18 (cut)
    with BuildSketch(Plane.XZ.offset(27.570852423084734)):
        with Locations((-10.250000000000004, 0)):
            Rectangle(SKETCH_38_W, SKETCH_38_H)
    extrude(amount=CUT_EXTRUDE_18_DEPTH, mode=Mode.SUBTRACT)

    # 草图39 → 凸台-拉伸11 (add)
    with BuildSketch(Plane.ZY.offset(10.250000000000004)):
        with Locations((12.000000000000004, 8.88e-15)):
            Rectangle(SKETCH_39_W, SKETCH_39_H)
    extrude(amount=EXTRUDE_11_DEPTH)

    # 草图40 → 切除-拉伸19 (cut, through all)
    with BuildSketch(Plane(origin=(0, 27.570852423084734, 0), x_dir=(1, 0, 0), z_dir=(0, 1, 0))):
        with Locations((-2.0000000000000036, -17)):
            Rectangle(SKETCH_40_W, SKETCH_40_H)
    extrude(amount=CUT_EXTRUDE_19_DEPTH, mode=Mode.SUBTRACT)

    # 草图41 → 凸台-拉伸12 (add)
    with BuildSketch(Plane(origin=(0, 27.570852423084734, 0), x_dir=(1, 0, 0), z_dir=(0, 1, 0))):
        Polygon((-12.250000000000004, 0), (-17.250000000000004, -6.1e-16), (-17.25, -34), (-12.250000000000004, -34), align=None)
    extrude_12 = extrude(amount=-EXTRUDE_12_DEPTH)

    # 镜向1: 凸台-拉伸12 across plane
    add(extrude_12.mirror(Plane.ZX))

    # 草图42 → 切除-拉伸20 (cut, through all)
    with BuildSketch(Plane.XZ.offset(27.570852423084734)):
        with Locations(Location((-14.750000000000002, 31.000000000000004, 0), (0, 0, 270))):
            Circle(SKETCH_42_R)
        with Locations(Location((-14.750000000000005, 2.9999999999999996, 0), (0, 0, 270))):
            Circle(SKETCH_42_R_2)
        with Locations(Location((-14.750000000000002, 17, 0), (0, 0, 270))):
            Circle(SKETCH_42_R_3)
    extrude(amount=-CUT_EXTRUDE_20_DEPTH, mode=Mode.SUBTRACT)

    # 圆角1
    fillet_1_edges = [part.edges().sort_by_distance(p)[0] for p in [
        (-17.25, 25.070852423084734, 34),
    ]]
    fillet(fillet_1_edges, radius=FILLET_1_R)

    # 圆角2
    fillet_2_edges = [part.edges().sort_by_distance(p)[0] for p in [
        (-17.25, -25.070852423084734, 34),
    ]]
    fillet(fillet_2_edges, radius=FILLET_2_R)

    # 圆角3
    fillet_3_edges = [part.edges().sort_by_distance(p)[0] for p in [
        (-17.250000000000004, -25.070852423084734, 6.1e-16),
    ]]
    fillet(fillet_3_edges, radius=FILLET_3_R)

    # 圆角4
    fillet_4_edges = [part.edges().sort_by_distance(p)[0] for p in [
        (-17.250000000000004, 25.070852423084734, 6.1e-16),
    ]]
    fillet(fillet_4_edges, radius=FILLET_4_R)

    # 圆角5
    # the kernel refuses this fillet: 1 mm, written as the material it adds along each edge
    with BuildSketch(Plane(origin=(-12.250000000000004, -22.570852423084734, 34), x_dir=(0, 1, 0), z_dir=(0, 0, -1))) as fillet_5_piece_1_section:
        with BuildLine():
            CenterArc((FILLET_5_R, -FILLET_5_R), FILLET_5_R, 90, 90)
            Line((0, -FILLET_5_R), (0, 0))
            Line((0, 0), (FILLET_5_R, 0))
        make_face()
    fillet_5_piece_1 = extrude(amount=34, mode=Mode.PRIVATE)
    fillet_5_piece_1 = fillet_5_piece_1 - Plane(origin=(-14.750000000000002, -22.34108976077406, 31.000000000000004), x_dir=(-1.8e-16, 0, -1), z_dir=(0, -1, 0)) * Cylinder(1.9999999999999991, 72, mode=Mode.PRIVATE)
    fillet_5_piece_1 = fillet_5_piece_1 - Plane(origin=(-14.750000000000005, -22.34108976077406, 2.9999999999999996), x_dir=(-1.8e-16, 0, -1), z_dir=(0, -1, 0)) * Cylinder(1.9999999999999996, 72, mode=Mode.PRIVATE)
    fillet_5_piece_1 = fillet_5_piece_1 - Plane(origin=(-14.750000000000002, -22.34108976077406, 17), x_dir=(-1.8e-16, 0, -1), z_dir=(0, -1, 0)) * Cylinder(2, 72, mode=Mode.PRIVATE)
    add(fillet_5_piece_1)

    # 圆角6
    # the kernel refuses this fillet: 1 mm, written as the material it adds along each edge
    with BuildSketch(Plane(origin=(-12.250000000000004, 22.570852423084734, 34), x_dir=(0, -1, 0), z_dir=(0, 0, -1))) as fillet_6_piece_1_section:
        with BuildLine():
            CenterArc((FILLET_6_R, FILLET_6_R), FILLET_6_R, 180, 90)
            Line((0, FILLET_6_R), (0, 0))
            Line((0, 0), (FILLET_6_R, 0))
        make_face()
    fillet_6_piece_1 = extrude(amount=34, mode=Mode.PRIVATE)
    fillet_6_piece_1 = fillet_6_piece_1 - Plane(origin=(-14.750000000000002, 22.341089760774064, 31.000000000000004), x_dir=(-1.8e-16, 0, -1), z_dir=(0, -1, 0)) * Cylinder(1.9999999999999991, 72, mode=Mode.PRIVATE)
    fillet_6_piece_1 = fillet_6_piece_1 - Plane(origin=(-14.750000000000005, 22.341089760774064, 2.9999999999999996), x_dir=(-1.8e-16, 0, -1), z_dir=(0, -1, 0)) * Cylinder(1.9999999999999996, 72, mode=Mode.PRIVATE)
    fillet_6_piece_1 = fillet_6_piece_1 - Plane(origin=(-14.750000000000002, 22.341089760774064, 17), x_dir=(-1.8e-16, 0, -1), z_dir=(0, -1, 0)) * Cylinder(2, 72, mode=Mode.PRIVATE)
    add(fillet_6_piece_1)


solid = part.part
